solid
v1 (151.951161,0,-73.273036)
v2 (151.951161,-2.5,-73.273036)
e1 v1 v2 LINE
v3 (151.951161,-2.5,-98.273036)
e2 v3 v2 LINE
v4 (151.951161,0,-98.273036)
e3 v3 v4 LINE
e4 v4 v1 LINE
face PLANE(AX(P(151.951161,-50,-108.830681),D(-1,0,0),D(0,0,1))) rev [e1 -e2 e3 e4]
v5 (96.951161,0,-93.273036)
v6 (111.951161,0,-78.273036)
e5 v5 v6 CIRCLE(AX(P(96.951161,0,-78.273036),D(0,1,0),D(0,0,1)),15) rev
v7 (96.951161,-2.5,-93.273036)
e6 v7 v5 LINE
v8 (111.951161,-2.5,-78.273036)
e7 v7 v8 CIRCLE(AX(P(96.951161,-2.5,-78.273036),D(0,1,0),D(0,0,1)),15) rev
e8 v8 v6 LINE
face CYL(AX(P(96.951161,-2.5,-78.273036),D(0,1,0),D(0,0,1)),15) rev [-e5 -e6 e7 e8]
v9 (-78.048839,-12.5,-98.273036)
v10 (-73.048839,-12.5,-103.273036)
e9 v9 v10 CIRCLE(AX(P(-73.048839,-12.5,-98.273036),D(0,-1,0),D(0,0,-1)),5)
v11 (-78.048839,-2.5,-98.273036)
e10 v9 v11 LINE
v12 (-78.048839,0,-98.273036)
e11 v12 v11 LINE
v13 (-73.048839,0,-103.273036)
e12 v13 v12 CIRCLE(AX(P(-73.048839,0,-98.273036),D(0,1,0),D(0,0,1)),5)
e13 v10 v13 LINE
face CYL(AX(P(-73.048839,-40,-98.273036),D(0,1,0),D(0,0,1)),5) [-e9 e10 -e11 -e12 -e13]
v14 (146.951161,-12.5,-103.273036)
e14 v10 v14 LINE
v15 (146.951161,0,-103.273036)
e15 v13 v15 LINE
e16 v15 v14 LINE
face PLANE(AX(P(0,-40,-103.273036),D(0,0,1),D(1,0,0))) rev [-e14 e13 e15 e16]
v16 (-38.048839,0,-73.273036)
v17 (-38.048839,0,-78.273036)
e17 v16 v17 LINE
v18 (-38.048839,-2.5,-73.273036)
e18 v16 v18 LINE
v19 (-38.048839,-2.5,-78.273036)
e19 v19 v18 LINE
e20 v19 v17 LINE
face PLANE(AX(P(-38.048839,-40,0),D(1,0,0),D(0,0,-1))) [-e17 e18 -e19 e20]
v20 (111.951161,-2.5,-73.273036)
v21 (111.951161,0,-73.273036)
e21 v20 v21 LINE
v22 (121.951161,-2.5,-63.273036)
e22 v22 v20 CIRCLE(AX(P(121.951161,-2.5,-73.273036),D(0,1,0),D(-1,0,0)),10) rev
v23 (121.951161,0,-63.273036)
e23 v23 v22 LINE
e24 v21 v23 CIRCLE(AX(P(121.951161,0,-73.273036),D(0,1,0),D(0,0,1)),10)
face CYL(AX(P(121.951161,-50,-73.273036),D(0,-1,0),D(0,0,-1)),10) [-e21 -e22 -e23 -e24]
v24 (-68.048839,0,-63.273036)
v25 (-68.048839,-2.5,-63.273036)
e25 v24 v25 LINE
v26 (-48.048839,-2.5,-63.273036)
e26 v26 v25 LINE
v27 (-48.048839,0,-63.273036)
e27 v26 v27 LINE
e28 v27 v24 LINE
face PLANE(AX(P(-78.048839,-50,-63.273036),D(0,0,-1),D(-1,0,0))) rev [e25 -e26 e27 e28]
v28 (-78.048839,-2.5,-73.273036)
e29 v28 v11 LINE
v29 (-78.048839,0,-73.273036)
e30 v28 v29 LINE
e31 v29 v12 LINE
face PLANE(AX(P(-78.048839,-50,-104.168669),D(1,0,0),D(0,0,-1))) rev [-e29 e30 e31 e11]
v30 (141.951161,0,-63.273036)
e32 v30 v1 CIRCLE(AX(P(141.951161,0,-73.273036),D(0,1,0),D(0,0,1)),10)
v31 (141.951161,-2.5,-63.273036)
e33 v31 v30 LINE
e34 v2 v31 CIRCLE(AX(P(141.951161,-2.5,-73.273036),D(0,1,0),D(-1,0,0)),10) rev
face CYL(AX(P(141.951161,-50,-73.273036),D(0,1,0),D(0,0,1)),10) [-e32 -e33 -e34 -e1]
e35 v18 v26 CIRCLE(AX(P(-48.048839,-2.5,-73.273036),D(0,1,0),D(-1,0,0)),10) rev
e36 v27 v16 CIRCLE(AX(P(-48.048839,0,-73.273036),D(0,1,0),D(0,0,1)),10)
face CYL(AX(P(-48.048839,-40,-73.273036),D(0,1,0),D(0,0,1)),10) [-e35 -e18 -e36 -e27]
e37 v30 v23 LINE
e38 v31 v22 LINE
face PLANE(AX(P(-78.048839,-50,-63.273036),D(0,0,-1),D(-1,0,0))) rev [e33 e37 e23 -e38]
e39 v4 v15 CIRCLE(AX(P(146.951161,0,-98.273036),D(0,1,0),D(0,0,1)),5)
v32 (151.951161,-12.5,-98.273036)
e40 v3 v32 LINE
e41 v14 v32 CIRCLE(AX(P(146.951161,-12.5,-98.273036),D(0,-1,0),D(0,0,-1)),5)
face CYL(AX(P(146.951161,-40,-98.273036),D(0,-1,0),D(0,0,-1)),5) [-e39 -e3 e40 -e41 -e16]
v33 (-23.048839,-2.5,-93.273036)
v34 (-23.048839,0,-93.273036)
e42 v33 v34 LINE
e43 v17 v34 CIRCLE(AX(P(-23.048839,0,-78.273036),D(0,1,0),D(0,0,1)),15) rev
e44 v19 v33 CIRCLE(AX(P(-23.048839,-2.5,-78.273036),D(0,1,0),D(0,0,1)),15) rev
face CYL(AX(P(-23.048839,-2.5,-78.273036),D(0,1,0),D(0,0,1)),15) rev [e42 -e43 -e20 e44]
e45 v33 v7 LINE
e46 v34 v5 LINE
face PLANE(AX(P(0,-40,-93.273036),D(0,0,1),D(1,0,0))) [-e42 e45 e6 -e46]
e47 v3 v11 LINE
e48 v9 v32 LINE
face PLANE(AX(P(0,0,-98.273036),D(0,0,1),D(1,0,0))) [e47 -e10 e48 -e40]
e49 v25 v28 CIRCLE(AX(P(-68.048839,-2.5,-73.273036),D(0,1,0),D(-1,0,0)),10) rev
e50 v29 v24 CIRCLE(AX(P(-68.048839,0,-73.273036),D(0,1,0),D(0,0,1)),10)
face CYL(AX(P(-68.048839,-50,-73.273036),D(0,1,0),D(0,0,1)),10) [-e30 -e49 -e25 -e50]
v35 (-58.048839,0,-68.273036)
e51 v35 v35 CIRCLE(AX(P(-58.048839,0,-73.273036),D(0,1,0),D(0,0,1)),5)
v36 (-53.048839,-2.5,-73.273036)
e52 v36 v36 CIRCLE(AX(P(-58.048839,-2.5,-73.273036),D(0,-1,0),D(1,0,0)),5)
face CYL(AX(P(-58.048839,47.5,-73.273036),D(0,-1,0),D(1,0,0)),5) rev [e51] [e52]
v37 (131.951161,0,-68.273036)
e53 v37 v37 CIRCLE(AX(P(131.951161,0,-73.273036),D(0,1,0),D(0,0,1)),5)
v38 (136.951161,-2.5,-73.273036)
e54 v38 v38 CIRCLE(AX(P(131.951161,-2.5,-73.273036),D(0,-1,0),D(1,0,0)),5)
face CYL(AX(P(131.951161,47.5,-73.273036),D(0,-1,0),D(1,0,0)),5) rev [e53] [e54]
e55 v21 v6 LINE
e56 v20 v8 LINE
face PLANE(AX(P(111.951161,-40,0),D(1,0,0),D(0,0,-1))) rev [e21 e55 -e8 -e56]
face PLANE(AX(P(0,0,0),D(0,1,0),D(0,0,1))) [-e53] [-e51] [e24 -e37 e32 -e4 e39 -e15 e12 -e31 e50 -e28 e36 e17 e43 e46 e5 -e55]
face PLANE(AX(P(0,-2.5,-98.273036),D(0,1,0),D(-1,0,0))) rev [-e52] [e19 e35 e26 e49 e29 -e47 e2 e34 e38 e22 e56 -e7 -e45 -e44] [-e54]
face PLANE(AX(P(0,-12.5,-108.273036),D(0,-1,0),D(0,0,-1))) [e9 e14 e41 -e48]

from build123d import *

# Parameters (mm, degrees)
BOSS_EXTRUDE2_DEPTH = 40
SKETCH2_W           = 50
SKETCH2_H           = 35
CUT_EXTRUDE1_DEPTH  = 45
SKETCH3_W           = 50
SKETCH3_H           = 35
CUT_EXTRUDE2_DEPTH  = 45
SKETCH4_W           = 150
SKETCH4_H           = 35
CUT_EXTRUDE3_DEPTH  = 5
CUT_EXTRUDE4_DEPTH  = 50
BOSS_EXTRUDE3_DEPTH = 2.5
BOSS_EXTRUDE4_START = -2.5
BOSS_EXTRUDE4_DEPTH = 2.5
SKETCH10_R          = 7.5
CUT_EXTRUDE5_DEPTH  = 50
CUT_EXTRUDE7_DEPTH  = 10
SKETCH12_W          = 250.559183642
SKETCH12_H          = 50.914019983
CUT_EXTRUDE8_DEPTH  = 10
SKETCH14_R          = 7.5
BOSS_EXTRUDE5_DEPTH = 2.5
SKETCH15_W          = 12.944399718
SKETCH15_H          = 51.5357406
SKETCH15_W_2        = 21.188165756
SKETCH15_H_2        = 60.611007318
CUT_EXTRUDE9_DEPTH  = 50
SKETCH17_W          = 230
SKETCH17_H          = 10
CUT_EXTRUDE10_DEPTH = 50
FILLET3_R           = 5
FILLET4_R           = 10
SKETCH18_R          = 5
CUT_EXTRUDE11_DEPTH = 50


with BuildPart() as part:
    # Sketch1 → Boss-Extrude2 (new body)
    with BuildSketch(Plane(origin=(0, 0, 0), x_dir=(1, 0, 0), z_dir=(0, 1, 0))):
        Polygon((36.951161, 103.273036008), (-88.048839, 103.273036008), (-88.048839, 53.273036008), (-38.048839, 53.273036008), (-38.048839, 93.273036008), (36.951161, 93.273036008), align=None)
        Polygon((161.951161, 103.273036008), (36.951161, 103.273036008), (36.951161, 93.273036008), (111.951161, 93.273036008), (111.951161, 53.273036008), (161.951161, 53.273036008), align=None)
    extrude(amount=-BOSS_EXTRUDE2_DEPTH)

    # Sketch2 → Cut-Extrude1 (cut)
    with BuildSketch(Plane.XY.offset(-53.273036008)):
        with Locations((-63.048839, -20)):
            Rectangle(SKETCH2_W, SKETCH2_H)
    extrude(amount=-CUT_EXTRUDE1_DEPTH, mode=Mode.SUBTRACT)

    # Sketch3 → Cut-Extrude2 (cut)
    with BuildSketch(Plane.XY.offset(-53.273036008)):
        with Locations((136.951161, -20)):
            Rectangle(SKETCH3_W, SKETCH3_H)
    extrude(amount=-CUT_EXTRUDE2_DEPTH, mode=Mode.SUBTRACT)

    # Sketch4 → Cut-Extrude3 (cut)
    with BuildSketch(Plane.XY.offset(-93.273036008)):
        with Locations((36.951161, -20)):
            Rectangle(SKETCH4_W, SKETCH4_H)
    extrude(amount=-CUT_EXTRUDE3_DEPTH, mode=Mode.SUBTRACT)

    # Sketch5 → Cut-Extrude4 (cut)
    with BuildSketch(Plane.XZ.offset(40)):
        with BuildLine():
            ThreePointArc((-80.548839, -103.273036008), (-85.852139859, -101.076336867), (-88.048839, -95.773036008))
            Line((-88.048839, -95.773036008), (-88.048839, -103.273036008))
            Line((-88.048839, -103.273036008), (-80.548839, -103.273036008))
        make_face()
        with BuildLine():
            ThreePointArc((-88.048839, -63.273036008), (-85.119906812, -56.201968196), (-78.048839, -53.273036008))
            Line((-78.048839, -53.273036008), (-88.048839, -53.273036008))
            Line((-88.048839, -53.273036008), (-88.048839, -63.273036008))
        make_face()
        with BuildLine():
            ThreePointArc((-48.048839, -53.273036008), (-40.977771189, -56.201968196), (-38.048839, -63.273036008))
            Line((-38.048839, -63.273036008), (-38.048839, -53.273036008))
            Line((-38.048839, -53.273036008), (-48.048839, -53.273036008))
        make_face()
        with BuildLine():
            Line((111.951161, -53.273036008), (111.951161, -63.273036008))
            ThreePointArc((111.951161, -63.273036008), (114.880093188, -56.201968196), (121.951161, -53.273036008))
            Line((121.951161, -53.273036008), (111.951161, -53.273036008))
        make_face()
        with BuildLine():
            Line((161.951161, -53.273036008), (151.951161, -53.273036008))
            ThreePointArc((151.951161, -53.273036008), (159.022228811, -56.201968196), (161.951161, -63.273036008))
            Line((161.951161, -63.273036008), (161.951161, -53.273036008))
        make_face()
        with BuildLine():
            ThreePointArc((161.951161, -95.773036008), (159.754461858, -101.076336867), (154.451161, -103.273036008))
            Line((154.451161, -103.273036008), (161.951161, -103.273036008))
            Line((161.951161, -103.273036008), (161.951161, -95.773036008))
        make_face()
    extrude(amount=-CUT_EXTRUDE4_DEPTH, mode=Mode.SUBTRACT)

    # Sketch8 → Boss-Extrude3 (add)
    with BuildSketch(Plane.XZ.offset(40)):
        with BuildLine():
            Line((-38.048839, -93.273036008), (-23.048839, -93.273036008))
            ThreePointArc((-23.048839, -93.273036008), (-33.655440718, -88.879637726), (-38.048839, -78.273036008))
            Line((-38.048839, -78.273036008), (-38.048839, -93.273036008))
        make_face()
        with BuildLine():
            ThreePointArc((111.951161, -78.273036008), (107.557762717, -88.879637726), (96.951161, -93.273036008))
            Line((96.951161, -93.273036008), (111.951161, -93.273036008))
            Line((111.951161, -93.273036008), (111.951161, -78.273036008))
        make_face()
    extrude(amount=-BOSS_EXTRUDE3_DEPTH)

    # Sketch9 → Boss-Extrude4 (add)
    with BuildSketch(Plane(origin=(0, 0, 0), x_dir=(1, 0, 0), z_dir=(0, 1, 0)).offset(BOSS_EXTRUDE4_START)):
        with BuildLine():
            Line((111.951161, 93.273036008), (96.951161, 93.273036008))
            ThreePointArc((96.951161, 93.273036008), (107.557762717, 88.879637726), (111.951161, 78.273036008))
            Line((111.951161, 78.273036008), (111.951161, 93.273036008))
        make_face()
        with BuildLine():
            ThreePointArc((-38.048839, 78.273036008), (-33.655440718, 88.879637726), (-23.048839, 93.273036008))
            Line((-23.048839, 93.273036008), (-38.048839, 93.273036008))
            Line((-38.048839, 93.273036008), (-38.048839, 78.273036008))
        make_face()
    extrude(amount=BOSS_EXTRUDE4_DEPTH)

    # Sketch10 → Cut-Extrude5 (cut)
    with BuildSketch(Plane(origin=(0, 0, 0), x_dir=(1, 0, 0), z_dir=(0, 1, 0))):
        with Locations(Location((-62.665129015, 73.273036008, 0), (0, 0, 270))):
            Circle(SKETCH10_R)
        with Locations(Location((136.567451014, 73.273036008, 0), (0, 0, 180))):
            Circle(SKETCH10_R)
    extrude(amount=-CUT_EXTRUDE5_DEPTH, mode=Mode.SUBTRACT)

    # Sketch11 → Cut-Extrude7 (cut)
    with BuildSketch(Plane.XY.offset(-98.273036008)):
        Polygon((161.522228811, -12.5), (-87.619906812, -12.5), (-87.619906812, -16.066465668), (-87.619906812, -37.5), (161.522228811, -37.5), (161.522228811, -16.066465668), align=None)
    extrude(amount=-CUT_EXTRUDE7_DEPTH, mode=Mode.SUBTRACT)


with BuildPart() as cut_extrude7_piece_1:
    # of the separate pieces the step leaves, piece 1, a body of its own (cut_extrude7_pieces)
    add(part.part.solids().sort_by_distance((-80.548839, -12.5, -103.273036008))[0])

    # Sketch14 → Boss-Extrude5 (add)
    with BuildSketch(Plane(origin=(0, 0, 0), x_dir=(1, 0, 0), z_dir=(0, 1, 0))):
        with Locations((-62.665129015, 73.273036008)):
            Circle(SKETCH14_R)
        with Locations((136.567451014, 73.273036008)):
            Circle(SKETCH14_R)
    extrude(amount=-BOSS_EXTRUDE5_DEPTH)

    # Sketch15 → Cut-Extrude9 (cut)
    with BuildSketch(Plane(origin=(0, 0, 0), x_dir=(1, 0, 0), z_dir=(0, 1, 0))):
        with Locations((-84.521038859, 78.400798504)):
            Rectangle(SKETCH15_W, SKETCH15_H)
        with Locations((162.545243878, 78.525177745)):
            Rectangle(SKETCH15_W_2, SKETCH15_H_2)
    extrude(amount=-CUT_EXTRUDE9_DEPTH, mode=Mode.SUBTRACT)

    # Sketch17 → Cut-Extrude10 (cut)
    with BuildSketch(Plane(origin=(0, 0, 0), x_dir=(1, 0, 0), z_dir=(0, 1, 0))):
        with Locations((36.951161, 58.273036008)):
            Rectangle(SKETCH17_W, SKETCH17_H)
    extrude(amount=-CUT_EXTRUDE10_DEPTH, mode=Mode.SUBTRACT)

    # Fillet3
    fillet3_edges = [cut_extrude7_piece_1.edges().sort_by_distance(p)[0] for p in [
        (151.951161, -6.25, -103.273036008),
        (-78.048839, -6.25, -103.273036008),
    ]]
    fillet(fillet3_edges, radius=FILLET3_R - 0.0001)  # a hair under: the kernel refuses the full size

    # Fillet4
    fillet4_edges = [cut_extrude7_piece_1.edges().sort_by_distance(p)[0] for p in [
        (151.951161, -1.25, -63.273036008),
        (-38.048839, -1.25, -63.273036008),
        (111.951161, -1.25, -63.273036008),
        (-78.048839, -1.25, -63.273036008),
    ]]
    fillet(fillet4_edges, radius=FILLET4_R)

    # Sketch18 → Cut-Extrude11 (cut)
    with BuildSketch(Plane.XZ.offset(2.5)):
        with Locations((131.951161, -73.273036008)):
            Circle(SKETCH18_R)
        with Locations((-58.048839, -73.273036008)):
            Circle(SKETCH18_R)
    extrude(amount=-CUT_EXTRUDE11_DEPTH, mode=Mode.SUBTRACT)


with BuildPart() as cut_extrude7_piece_2:
    # of the separate pieces the step leaves, piece 2, a body of its own (cut_extrude7_pieces)
    add(part.part.solids().sort_by_distance((154.451161, -40, -103.273036008))[0])

    # Sketch12 → Cut-Extrude8 (cut)
    with BuildSketch(Plane.XZ.offset(40)):
        with Locations((37.230752821, -78.730046)):
            Rectangle(SKETCH12_W, SKETCH12_H)
    extrude(amount=-CUT_EXTRUDE8_DEPTH, mode=Mode.SUBTRACT)


solid = cut_extrude7_piece_1.part
